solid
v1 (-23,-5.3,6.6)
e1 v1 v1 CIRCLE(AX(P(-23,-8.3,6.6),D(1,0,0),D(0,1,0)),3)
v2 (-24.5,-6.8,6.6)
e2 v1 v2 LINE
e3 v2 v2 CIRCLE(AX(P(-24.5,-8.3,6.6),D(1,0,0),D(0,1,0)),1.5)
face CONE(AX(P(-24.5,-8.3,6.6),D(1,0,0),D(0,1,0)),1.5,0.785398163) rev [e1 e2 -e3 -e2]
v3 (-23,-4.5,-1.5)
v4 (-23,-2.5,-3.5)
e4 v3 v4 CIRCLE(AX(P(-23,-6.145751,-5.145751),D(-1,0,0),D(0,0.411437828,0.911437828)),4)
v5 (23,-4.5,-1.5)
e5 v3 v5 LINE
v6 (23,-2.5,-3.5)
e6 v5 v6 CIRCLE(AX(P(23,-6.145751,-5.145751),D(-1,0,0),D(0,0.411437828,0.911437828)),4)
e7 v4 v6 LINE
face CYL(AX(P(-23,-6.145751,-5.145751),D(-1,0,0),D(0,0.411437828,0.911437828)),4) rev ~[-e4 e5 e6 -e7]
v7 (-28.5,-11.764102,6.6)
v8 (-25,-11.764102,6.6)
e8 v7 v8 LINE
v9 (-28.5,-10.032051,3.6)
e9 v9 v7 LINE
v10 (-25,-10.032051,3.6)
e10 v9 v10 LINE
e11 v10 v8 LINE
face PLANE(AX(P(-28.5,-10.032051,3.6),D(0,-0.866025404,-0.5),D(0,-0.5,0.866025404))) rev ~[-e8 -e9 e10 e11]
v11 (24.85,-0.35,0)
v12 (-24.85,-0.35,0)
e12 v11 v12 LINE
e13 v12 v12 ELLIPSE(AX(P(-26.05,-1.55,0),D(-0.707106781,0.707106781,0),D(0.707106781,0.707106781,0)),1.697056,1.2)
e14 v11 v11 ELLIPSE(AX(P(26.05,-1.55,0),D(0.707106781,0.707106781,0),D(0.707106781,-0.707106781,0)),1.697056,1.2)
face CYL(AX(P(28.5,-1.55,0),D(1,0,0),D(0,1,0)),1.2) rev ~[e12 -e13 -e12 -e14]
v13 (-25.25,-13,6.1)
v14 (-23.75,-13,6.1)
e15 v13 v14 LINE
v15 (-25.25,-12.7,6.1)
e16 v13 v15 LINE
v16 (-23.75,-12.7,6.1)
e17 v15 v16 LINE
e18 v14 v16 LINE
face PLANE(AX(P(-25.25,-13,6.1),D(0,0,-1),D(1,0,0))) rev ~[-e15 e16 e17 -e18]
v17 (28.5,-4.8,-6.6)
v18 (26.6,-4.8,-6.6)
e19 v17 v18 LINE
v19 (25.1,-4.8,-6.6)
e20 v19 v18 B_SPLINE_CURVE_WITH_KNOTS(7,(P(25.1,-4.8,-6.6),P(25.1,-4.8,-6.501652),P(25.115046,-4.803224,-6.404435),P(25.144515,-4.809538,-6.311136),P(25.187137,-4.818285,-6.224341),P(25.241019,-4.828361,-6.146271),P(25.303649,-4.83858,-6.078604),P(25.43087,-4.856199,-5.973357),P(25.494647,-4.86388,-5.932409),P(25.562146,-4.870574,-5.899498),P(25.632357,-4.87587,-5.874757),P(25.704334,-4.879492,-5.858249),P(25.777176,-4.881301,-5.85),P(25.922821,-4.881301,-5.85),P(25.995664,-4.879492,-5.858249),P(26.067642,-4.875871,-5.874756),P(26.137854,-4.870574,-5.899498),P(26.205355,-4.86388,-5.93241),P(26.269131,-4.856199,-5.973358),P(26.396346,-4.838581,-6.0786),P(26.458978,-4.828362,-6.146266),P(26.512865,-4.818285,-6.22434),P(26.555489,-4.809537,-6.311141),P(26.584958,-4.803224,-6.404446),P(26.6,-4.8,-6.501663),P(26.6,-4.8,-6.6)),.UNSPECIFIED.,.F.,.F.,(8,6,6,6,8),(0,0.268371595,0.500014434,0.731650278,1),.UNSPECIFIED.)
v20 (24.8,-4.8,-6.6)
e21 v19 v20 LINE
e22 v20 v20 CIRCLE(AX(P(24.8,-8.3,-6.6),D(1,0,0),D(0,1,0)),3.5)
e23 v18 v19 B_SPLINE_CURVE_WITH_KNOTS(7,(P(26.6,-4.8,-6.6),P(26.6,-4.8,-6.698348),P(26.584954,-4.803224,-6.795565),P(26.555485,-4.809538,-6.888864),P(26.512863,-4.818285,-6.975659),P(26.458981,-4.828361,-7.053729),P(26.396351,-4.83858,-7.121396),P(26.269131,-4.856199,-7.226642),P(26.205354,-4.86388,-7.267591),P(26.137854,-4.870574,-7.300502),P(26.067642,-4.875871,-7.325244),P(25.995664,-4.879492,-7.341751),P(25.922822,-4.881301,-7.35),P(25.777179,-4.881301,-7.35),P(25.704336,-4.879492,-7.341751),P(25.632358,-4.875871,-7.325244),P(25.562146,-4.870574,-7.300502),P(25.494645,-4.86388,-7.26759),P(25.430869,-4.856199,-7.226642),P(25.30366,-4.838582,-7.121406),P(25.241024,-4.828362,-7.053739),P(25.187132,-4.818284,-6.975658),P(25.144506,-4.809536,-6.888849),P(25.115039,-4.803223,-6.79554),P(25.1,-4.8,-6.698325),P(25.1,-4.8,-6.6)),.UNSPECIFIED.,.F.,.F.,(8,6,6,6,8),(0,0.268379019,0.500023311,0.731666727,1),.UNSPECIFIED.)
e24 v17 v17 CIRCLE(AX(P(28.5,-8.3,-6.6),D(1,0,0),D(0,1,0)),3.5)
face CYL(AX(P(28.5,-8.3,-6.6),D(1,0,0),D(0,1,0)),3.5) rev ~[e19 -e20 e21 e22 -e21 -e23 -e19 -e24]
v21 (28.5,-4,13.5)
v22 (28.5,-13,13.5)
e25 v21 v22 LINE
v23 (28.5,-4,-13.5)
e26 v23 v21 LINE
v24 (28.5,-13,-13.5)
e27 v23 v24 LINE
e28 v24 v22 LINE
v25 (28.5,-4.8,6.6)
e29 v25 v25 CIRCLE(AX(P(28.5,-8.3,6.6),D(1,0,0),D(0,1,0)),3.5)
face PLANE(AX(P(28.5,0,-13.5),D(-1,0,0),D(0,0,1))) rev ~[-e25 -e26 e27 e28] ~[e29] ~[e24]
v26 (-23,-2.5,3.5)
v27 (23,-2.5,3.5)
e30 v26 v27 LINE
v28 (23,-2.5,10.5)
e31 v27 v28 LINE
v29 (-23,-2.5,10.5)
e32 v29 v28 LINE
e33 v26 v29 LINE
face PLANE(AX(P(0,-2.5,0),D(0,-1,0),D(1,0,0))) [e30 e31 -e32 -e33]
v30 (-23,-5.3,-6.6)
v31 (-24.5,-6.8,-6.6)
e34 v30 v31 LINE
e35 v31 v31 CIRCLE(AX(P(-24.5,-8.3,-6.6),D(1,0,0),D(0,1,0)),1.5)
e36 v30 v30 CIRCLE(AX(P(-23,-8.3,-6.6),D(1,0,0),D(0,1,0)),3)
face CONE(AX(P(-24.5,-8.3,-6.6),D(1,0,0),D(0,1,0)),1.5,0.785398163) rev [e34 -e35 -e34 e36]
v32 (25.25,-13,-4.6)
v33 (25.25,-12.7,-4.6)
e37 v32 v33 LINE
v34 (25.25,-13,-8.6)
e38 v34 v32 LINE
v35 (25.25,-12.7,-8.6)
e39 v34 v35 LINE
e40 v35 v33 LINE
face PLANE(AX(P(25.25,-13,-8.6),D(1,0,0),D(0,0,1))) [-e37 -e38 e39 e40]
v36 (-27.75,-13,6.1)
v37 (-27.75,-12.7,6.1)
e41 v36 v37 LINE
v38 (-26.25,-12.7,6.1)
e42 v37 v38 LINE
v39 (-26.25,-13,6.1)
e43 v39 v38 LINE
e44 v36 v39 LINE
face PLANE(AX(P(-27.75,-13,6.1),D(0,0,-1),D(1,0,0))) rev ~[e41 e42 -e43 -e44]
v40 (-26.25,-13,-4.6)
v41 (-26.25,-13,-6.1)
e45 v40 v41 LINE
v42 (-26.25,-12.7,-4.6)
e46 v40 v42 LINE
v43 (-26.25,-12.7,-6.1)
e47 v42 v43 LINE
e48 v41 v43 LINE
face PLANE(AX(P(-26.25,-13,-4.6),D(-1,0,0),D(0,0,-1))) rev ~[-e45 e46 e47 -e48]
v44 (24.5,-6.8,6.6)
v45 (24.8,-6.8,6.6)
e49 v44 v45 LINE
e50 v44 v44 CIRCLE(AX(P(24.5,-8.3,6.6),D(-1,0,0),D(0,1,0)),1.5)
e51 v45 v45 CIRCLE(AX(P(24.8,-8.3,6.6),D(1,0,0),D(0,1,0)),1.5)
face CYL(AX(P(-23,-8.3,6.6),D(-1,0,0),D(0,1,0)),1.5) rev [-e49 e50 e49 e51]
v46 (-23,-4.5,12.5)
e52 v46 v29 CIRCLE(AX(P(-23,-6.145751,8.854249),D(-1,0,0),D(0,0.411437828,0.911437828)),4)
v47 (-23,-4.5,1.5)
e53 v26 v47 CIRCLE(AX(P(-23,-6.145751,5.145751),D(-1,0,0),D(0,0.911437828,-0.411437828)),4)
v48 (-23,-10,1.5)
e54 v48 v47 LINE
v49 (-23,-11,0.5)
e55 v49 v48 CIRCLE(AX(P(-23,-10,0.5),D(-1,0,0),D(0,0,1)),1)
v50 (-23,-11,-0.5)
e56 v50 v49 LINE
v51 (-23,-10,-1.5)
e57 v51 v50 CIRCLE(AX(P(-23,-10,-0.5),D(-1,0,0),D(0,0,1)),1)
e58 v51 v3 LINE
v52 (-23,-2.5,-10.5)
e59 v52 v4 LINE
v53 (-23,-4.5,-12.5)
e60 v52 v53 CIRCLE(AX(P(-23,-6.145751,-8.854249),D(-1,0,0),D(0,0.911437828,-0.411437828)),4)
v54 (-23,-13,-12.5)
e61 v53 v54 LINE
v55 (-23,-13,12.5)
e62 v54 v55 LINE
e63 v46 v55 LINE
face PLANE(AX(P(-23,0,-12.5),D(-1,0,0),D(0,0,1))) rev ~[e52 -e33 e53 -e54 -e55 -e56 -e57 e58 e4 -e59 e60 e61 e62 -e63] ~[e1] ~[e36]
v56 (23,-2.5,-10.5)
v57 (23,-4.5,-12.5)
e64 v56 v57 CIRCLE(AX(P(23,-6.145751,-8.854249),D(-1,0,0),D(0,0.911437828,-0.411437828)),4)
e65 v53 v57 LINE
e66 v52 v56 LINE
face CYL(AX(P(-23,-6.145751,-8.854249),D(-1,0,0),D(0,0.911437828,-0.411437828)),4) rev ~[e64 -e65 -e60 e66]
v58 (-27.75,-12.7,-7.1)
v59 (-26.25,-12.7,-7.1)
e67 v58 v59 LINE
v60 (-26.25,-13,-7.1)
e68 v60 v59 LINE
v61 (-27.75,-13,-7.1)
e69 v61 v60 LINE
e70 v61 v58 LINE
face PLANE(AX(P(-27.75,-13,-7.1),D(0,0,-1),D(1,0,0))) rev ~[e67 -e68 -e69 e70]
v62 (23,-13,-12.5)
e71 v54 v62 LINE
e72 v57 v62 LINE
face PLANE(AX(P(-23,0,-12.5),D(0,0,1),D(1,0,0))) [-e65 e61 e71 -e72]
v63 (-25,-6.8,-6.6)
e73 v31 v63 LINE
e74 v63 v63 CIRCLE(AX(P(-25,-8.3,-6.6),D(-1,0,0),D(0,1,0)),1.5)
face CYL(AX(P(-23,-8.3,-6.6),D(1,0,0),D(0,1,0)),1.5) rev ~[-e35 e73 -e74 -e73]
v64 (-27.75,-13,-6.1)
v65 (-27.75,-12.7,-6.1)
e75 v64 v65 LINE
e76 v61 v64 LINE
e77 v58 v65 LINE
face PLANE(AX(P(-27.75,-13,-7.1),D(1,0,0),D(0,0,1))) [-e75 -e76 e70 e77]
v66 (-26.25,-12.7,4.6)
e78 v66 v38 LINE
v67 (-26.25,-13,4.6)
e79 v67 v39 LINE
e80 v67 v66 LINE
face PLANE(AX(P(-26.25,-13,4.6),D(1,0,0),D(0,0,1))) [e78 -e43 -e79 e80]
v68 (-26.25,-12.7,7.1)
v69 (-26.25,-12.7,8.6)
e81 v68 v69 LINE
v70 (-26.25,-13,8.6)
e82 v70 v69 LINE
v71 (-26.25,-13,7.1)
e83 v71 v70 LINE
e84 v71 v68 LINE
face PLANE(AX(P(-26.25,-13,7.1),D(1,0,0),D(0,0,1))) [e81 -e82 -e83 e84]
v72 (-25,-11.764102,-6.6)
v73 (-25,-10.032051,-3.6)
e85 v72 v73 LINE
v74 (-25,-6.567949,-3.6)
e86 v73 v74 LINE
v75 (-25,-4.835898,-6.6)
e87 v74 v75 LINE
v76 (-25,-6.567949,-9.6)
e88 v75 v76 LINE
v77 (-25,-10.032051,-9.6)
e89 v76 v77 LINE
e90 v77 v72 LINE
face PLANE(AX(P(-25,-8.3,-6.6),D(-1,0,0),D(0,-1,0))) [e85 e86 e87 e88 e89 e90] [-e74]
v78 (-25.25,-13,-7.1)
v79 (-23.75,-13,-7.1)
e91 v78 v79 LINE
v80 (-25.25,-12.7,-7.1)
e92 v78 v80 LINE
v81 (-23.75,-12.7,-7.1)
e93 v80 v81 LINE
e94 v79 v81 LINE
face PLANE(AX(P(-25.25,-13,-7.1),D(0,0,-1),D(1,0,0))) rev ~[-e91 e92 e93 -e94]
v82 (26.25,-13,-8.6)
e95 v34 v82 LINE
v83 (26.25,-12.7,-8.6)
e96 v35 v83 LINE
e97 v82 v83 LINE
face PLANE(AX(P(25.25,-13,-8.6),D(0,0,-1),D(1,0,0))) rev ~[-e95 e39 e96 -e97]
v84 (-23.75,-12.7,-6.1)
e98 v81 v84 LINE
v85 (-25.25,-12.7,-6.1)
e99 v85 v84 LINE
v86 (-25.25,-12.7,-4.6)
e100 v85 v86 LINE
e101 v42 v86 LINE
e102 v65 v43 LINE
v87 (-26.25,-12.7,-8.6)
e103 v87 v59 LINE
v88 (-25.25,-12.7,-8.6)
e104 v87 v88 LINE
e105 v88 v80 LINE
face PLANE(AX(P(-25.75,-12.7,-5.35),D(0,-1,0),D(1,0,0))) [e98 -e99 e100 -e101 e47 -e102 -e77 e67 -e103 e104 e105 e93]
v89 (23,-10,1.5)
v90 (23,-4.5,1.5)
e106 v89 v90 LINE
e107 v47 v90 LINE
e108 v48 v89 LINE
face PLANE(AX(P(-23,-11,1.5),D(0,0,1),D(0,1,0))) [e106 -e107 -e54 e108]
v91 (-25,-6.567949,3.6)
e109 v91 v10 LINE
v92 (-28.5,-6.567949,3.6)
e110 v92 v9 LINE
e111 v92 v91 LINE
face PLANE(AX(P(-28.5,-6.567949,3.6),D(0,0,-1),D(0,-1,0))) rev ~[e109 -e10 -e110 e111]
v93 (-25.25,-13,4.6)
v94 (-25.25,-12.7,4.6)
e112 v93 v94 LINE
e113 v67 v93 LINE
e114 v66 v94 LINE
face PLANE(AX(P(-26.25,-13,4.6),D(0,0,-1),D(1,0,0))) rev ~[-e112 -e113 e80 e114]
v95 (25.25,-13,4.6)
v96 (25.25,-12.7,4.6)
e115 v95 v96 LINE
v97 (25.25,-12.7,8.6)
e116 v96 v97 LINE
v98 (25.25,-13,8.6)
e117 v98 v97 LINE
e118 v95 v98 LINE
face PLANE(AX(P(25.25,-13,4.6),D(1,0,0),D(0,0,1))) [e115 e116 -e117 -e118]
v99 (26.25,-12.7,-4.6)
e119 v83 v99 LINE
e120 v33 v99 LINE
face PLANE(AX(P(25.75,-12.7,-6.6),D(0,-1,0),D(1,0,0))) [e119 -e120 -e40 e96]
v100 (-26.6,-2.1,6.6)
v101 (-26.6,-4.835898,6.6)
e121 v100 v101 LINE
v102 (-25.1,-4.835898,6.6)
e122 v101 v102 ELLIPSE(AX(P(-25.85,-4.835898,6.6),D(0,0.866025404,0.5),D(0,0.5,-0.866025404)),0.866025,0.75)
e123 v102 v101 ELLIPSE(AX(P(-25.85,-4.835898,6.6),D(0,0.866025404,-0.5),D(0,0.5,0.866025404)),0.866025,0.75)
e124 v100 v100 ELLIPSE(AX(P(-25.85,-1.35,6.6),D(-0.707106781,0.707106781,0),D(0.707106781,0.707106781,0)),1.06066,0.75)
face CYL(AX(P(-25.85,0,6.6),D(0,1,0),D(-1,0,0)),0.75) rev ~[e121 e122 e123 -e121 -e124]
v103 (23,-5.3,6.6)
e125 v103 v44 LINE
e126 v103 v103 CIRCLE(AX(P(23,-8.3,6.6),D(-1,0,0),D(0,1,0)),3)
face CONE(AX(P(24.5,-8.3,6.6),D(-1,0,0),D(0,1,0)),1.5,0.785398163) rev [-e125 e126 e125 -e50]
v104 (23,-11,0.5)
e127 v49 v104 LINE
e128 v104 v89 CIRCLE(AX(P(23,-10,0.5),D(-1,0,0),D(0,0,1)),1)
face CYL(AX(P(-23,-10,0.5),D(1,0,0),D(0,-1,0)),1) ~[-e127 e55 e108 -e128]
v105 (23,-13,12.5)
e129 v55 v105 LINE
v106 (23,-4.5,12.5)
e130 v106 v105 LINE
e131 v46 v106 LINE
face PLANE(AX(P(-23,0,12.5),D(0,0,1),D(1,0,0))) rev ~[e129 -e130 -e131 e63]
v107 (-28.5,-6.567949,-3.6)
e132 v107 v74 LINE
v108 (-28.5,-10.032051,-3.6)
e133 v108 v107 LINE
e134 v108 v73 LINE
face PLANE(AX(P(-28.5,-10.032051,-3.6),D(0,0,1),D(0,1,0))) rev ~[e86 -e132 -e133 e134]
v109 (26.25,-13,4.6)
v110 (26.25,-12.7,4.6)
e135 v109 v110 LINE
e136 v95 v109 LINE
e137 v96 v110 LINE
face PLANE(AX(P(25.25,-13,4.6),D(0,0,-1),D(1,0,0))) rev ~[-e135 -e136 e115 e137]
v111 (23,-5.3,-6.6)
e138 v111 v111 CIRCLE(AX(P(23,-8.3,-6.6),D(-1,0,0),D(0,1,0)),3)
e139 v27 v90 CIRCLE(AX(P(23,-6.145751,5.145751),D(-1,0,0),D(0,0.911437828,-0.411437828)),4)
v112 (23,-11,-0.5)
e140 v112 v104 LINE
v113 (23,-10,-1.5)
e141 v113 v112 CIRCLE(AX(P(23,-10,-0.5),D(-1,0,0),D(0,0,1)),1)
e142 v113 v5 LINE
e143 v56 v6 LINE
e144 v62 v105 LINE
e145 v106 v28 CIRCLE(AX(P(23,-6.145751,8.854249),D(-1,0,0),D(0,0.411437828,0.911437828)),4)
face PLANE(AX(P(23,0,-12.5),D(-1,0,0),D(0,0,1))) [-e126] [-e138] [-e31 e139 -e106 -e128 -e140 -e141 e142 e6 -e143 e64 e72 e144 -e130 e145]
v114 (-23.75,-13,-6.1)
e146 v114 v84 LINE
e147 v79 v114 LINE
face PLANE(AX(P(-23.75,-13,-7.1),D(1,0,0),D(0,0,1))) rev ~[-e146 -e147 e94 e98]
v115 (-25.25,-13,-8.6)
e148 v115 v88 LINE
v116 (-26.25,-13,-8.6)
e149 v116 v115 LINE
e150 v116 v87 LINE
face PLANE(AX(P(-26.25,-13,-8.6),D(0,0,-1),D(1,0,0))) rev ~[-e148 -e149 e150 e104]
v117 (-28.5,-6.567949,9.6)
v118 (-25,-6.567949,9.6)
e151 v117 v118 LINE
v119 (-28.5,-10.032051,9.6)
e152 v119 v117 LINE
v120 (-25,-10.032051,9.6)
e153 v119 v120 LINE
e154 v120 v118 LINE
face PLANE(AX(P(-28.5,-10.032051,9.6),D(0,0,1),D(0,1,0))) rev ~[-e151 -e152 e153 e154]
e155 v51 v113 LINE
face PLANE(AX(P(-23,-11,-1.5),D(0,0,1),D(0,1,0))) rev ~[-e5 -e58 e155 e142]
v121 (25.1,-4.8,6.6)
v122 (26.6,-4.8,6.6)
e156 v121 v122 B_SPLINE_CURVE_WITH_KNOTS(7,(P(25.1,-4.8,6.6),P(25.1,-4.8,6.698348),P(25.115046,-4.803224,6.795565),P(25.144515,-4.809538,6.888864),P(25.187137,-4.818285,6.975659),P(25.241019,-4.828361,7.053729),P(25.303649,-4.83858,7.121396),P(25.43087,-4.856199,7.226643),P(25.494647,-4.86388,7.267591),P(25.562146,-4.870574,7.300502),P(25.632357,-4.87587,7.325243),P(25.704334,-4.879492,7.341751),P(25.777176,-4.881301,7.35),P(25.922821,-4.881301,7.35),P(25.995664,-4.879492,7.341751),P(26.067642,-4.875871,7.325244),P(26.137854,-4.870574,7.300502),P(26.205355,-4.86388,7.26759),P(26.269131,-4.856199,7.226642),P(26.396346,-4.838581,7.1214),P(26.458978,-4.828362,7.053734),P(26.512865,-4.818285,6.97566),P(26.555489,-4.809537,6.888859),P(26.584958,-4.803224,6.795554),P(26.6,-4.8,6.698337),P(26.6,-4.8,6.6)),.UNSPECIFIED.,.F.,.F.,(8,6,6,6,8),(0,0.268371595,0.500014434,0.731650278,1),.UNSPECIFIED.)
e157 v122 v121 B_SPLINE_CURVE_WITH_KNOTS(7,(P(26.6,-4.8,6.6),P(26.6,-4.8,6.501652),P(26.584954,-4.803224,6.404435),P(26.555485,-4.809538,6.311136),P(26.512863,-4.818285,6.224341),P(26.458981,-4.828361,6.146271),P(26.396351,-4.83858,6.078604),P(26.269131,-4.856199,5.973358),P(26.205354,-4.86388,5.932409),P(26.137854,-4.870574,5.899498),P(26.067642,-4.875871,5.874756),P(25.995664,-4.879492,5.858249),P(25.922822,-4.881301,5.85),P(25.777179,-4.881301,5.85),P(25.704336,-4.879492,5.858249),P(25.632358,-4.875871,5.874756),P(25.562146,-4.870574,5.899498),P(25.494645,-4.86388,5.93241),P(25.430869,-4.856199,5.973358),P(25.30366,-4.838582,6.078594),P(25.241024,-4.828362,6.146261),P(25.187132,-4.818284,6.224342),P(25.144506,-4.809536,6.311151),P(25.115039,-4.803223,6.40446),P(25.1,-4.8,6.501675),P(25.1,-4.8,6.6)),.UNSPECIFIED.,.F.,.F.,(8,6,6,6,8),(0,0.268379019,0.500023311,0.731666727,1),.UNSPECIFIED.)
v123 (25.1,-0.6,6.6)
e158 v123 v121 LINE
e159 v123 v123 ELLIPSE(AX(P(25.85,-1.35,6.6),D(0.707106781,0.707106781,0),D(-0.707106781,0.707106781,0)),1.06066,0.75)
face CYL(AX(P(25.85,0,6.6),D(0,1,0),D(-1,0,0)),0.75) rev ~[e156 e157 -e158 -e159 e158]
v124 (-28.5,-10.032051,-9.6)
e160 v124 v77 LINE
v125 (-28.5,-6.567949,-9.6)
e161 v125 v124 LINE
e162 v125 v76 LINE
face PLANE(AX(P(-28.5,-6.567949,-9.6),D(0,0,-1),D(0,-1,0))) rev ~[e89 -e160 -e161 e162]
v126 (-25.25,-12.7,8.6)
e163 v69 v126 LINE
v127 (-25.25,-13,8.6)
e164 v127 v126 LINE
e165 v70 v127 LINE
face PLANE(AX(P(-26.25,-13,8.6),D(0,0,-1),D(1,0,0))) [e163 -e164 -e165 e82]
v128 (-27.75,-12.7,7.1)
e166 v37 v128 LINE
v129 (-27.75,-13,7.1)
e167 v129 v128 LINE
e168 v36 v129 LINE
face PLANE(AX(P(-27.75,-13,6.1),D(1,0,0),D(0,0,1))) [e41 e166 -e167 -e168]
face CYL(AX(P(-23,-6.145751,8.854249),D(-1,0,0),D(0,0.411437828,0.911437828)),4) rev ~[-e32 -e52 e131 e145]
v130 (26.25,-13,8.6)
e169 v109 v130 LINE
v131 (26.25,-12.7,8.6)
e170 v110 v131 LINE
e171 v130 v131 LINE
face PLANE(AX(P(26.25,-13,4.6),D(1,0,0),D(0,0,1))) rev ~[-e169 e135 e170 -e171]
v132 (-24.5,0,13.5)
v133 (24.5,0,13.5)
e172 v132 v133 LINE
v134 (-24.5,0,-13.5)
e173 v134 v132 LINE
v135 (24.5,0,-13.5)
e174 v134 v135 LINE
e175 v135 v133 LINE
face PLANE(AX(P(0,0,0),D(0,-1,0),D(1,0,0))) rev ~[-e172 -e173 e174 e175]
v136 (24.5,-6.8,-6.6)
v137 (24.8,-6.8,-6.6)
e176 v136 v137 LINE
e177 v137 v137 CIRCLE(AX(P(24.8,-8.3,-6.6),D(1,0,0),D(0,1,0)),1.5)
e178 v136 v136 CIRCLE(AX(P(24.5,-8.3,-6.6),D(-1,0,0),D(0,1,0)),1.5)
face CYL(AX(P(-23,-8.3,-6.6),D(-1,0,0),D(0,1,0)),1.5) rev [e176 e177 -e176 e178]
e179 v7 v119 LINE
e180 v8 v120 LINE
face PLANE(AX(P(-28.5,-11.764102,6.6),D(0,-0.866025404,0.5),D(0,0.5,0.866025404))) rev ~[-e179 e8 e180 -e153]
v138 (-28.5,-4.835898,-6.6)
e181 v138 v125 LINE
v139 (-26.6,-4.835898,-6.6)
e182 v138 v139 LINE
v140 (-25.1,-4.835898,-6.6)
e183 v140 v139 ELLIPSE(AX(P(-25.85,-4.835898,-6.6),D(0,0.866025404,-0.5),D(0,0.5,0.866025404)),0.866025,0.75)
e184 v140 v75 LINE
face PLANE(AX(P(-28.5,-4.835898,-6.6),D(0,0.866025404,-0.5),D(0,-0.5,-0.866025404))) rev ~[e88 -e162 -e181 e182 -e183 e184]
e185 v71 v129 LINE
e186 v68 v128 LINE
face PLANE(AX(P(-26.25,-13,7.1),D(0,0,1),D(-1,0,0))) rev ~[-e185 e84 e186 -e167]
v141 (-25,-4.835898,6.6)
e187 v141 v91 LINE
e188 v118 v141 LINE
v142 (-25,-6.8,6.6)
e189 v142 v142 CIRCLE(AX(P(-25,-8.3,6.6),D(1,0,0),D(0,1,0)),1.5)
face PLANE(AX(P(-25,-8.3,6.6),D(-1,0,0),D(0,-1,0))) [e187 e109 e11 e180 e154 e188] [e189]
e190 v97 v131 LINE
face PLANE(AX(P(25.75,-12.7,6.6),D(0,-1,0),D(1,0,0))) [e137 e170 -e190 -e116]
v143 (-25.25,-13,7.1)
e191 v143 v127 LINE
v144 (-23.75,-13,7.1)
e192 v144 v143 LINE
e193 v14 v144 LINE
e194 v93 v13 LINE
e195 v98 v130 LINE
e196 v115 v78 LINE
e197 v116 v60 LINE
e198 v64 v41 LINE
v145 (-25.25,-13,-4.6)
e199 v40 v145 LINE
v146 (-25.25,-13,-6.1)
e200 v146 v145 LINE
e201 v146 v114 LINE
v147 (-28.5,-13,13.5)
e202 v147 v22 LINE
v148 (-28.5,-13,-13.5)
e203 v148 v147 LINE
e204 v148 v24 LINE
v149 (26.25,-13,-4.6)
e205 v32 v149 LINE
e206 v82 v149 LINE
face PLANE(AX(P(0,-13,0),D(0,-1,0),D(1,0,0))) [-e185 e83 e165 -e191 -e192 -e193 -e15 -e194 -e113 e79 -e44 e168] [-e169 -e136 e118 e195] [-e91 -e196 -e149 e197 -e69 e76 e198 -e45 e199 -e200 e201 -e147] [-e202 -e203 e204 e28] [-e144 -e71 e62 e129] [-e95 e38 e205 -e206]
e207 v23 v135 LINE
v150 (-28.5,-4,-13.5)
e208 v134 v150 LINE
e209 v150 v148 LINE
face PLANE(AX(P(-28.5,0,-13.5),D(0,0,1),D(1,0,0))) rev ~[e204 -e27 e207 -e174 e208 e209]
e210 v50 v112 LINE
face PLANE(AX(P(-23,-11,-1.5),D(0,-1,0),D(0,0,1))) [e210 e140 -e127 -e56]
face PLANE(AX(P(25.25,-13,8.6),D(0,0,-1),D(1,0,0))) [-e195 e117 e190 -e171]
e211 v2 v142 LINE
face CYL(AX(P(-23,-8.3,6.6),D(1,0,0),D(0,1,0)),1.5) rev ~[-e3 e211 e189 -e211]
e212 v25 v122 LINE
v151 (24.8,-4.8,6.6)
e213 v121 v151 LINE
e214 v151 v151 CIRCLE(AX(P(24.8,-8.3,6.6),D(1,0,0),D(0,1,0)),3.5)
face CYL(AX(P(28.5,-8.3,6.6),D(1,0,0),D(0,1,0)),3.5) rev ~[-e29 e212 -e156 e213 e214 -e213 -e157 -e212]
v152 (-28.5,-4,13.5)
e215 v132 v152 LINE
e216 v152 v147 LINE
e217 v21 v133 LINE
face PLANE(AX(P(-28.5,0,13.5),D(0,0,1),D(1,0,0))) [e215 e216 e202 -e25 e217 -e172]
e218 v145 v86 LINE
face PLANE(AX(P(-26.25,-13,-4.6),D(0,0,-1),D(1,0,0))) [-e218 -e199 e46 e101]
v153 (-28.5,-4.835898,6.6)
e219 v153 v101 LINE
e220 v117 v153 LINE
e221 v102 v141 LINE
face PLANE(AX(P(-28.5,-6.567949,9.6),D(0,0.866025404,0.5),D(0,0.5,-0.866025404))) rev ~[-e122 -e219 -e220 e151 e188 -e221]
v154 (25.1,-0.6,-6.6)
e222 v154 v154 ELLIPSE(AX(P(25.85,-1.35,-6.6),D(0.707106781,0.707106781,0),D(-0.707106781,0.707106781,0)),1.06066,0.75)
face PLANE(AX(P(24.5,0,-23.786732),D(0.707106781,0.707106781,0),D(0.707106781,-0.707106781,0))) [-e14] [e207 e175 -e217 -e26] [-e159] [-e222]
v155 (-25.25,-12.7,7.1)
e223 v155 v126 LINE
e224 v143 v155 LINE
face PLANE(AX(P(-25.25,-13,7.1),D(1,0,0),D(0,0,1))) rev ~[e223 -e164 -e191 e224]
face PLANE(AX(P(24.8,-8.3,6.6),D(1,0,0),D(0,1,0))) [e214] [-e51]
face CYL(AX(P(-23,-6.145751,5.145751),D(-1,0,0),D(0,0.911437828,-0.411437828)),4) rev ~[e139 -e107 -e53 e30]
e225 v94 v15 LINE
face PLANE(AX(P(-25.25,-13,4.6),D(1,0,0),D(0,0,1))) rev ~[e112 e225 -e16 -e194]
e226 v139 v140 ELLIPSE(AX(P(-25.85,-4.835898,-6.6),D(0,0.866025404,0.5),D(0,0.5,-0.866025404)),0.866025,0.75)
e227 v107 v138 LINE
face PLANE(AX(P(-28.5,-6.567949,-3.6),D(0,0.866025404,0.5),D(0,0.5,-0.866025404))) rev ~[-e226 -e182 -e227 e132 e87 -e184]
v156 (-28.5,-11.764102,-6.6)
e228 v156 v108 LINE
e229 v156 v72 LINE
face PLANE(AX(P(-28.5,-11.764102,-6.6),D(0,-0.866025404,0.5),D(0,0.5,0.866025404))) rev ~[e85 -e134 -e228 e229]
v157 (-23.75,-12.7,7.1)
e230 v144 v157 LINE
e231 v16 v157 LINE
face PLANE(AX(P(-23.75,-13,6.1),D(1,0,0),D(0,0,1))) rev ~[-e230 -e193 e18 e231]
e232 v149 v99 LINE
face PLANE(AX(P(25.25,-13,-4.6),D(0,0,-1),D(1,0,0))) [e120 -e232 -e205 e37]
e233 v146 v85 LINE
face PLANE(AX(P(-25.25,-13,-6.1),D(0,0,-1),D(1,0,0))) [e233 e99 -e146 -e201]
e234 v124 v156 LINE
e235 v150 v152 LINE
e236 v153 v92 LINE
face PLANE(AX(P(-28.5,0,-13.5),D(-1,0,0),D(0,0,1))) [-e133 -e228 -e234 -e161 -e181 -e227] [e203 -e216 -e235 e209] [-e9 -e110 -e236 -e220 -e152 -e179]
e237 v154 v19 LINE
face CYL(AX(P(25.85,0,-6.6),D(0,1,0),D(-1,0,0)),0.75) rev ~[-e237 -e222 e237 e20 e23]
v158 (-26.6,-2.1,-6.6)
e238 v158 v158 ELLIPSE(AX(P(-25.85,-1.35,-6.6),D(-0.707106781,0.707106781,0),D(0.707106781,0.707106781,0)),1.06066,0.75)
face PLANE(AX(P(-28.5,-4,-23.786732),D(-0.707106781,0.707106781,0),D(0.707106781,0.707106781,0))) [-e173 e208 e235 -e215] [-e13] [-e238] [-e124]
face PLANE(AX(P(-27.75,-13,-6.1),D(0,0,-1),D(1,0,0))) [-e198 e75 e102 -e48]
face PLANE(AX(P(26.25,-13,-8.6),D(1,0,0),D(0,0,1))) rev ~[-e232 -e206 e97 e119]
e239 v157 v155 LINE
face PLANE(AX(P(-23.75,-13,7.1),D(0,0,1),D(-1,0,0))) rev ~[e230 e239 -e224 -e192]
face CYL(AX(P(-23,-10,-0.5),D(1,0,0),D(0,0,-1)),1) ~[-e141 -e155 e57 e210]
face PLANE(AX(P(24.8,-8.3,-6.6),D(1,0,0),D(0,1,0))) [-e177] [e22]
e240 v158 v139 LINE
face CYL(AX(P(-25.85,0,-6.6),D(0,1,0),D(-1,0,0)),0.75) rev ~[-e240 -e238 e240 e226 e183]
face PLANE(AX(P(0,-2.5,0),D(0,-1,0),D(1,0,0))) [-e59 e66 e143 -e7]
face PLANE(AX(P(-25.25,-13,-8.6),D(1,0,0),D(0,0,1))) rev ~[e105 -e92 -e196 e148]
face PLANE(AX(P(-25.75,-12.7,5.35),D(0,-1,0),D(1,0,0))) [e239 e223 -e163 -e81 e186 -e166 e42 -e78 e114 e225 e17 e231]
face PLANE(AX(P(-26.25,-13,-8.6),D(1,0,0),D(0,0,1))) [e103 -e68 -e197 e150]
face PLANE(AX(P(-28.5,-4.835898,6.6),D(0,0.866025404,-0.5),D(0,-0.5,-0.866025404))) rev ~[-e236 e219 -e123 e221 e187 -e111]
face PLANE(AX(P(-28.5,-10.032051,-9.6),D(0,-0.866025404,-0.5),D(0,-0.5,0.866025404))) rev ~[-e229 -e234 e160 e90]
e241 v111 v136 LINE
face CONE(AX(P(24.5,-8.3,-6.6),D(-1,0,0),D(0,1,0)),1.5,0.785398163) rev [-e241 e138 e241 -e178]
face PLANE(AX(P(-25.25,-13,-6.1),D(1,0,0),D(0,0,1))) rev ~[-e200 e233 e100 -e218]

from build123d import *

# Parameters (mm, degrees)
F0_W          = 57
F0_H          = 27
F0_W_2        = 46
F0_H_2        = 25
F1_DEPTH      = 13
F2_DEPTH      = 2.5
F3_W          = 10
F3_H          = 3
F4_DEPTH      = 46
F5_R          = 1.5
F6_DEPTH      = 5.501
F6_DEPTH_BACK = 51.501
F7_SIZE       = 1.5
F8_R          = 1.5
F9_DEPTH      = 3.5
F10_R         = 3.5
F10_R_2       = 1.5
F11_DEPTH     = 3.7
F13_DEPTH     = 46
F14_R         = 1.2
F15_DEPTH     = 57.001
F16_R         = 0.75
F17_DEPTH     = 6
F18_T1_DEPTH  = 47.5734639037
F19_W         = 1
F19_H         = 4
F19_H_2       = 1.5
F19_W_2       = 1.5
F19_H_3       = 1
F20_DEPTH     = 0.3
F21_R         = 1


# Not quite as in the source:
# - a fillet or chamfer that OpenCascade refuses, or shapes differently, is made with other operations: its cross-section is extruded or revolved along the edge and cut away or added


with BuildPart() as f1:
    # F0 (on Front) → F1 (new body)
    with BuildSketch(Plane.XZ):
        Rectangle(F0_W, F0_H)
        Rectangle(F0_W_2, F0_H_2, mode=Mode.SUBTRACT)
    extrude(amount=F1_DEPTH)

    # F0 (on Front) → F2 (join)
    with BuildSketch(Plane.XZ):
        Rectangle(F0_W_2, F0_H_2)
    extrude(amount=F2_DEPTH)

    # F3 (on face) → F4 (join, through all)
    with BuildSketch(Plane.YZ.offset(-23)):
        with Locations((-6, 0)):
            Rectangle(F3_W, F3_H)
    extrude(amount=F4_DEPTH)

    # F5 (on face) → F6 (cut, two sides)
    with BuildSketch(Plane.YZ.offset(-23)) as f6_sk:
        with Locations((-8.3, 6.6)):
            Circle(F5_R)
        with Locations((-8.3, -6.6)):
            Circle(F5_R)
    extrude(amount=-F6_DEPTH, mode=Mode.SUBTRACT)
    extrude(f6_sk.sketch, amount=F6_DEPTH_BACK, mode=Mode.SUBTRACT)

    # F7
    f7_edges = [f1.edges().sort_by_distance(p)[0] for p in [
        (-23, -9.8, 6.6),
        (-23, -9.8, -6.6),
        (23, -9.8, 6.6),
        (23, -9.8, -6.6),
    ]]
    chamfer(f7_edges, length=F7_SIZE)

    # F8 (on face) → F9 (cut)
    with BuildSketch(Plane(origin=(-28.5, 0, 0), x_dir=(0, -1, 0), z_dir=(-1, 0, 0))):
        Polygon((6.5679491924, -3.6), (4.8358983849, -6.6), (6.5679491924, -9.6), (10.0320508076, -9.6), (11.7641016151, -6.6), (10.0320508076, -3.6), align=None)
        with Locations((8.3, -6.6)):
            Circle(F8_R, mode=Mode.SUBTRACT)
        Polygon((10.0320508076, 9.6), (6.5679491924, 9.6), (4.8358983849, 6.6), (6.5679491924, 3.6), (10.0320508076, 3.6), (11.7641016151, 6.6), align=None)
        with Locations((8.3, 6.6)):
            Circle(F8_R, mode=Mode.SUBTRACT)
        with Locations((8.3, 6.6)):
            Circle(F8_R)
    extrude(amount=-F9_DEPTH, mode=Mode.SUBTRACT)

    # F10 (on face) → F11 (cut)
    with BuildSketch(Plane.YZ.offset(28.5)):
        with Locations((-8.3, 6.6)):
            Circle(F10_R)
        with Locations((-8.3, 6.6)):
            Circle(F10_R_2, mode=Mode.SUBTRACT)
        with Locations((-8.3, -6.6)):
            Circle(F10_R)
        with Locations((-8.3, -6.6)):
            Circle(F10_R_2, mode=Mode.SUBTRACT)
    extrude(amount=-F11_DEPTH, mode=Mode.SUBTRACT)

    # F12 (on face) → F13 (join, through all)
    with BuildSketch(Plane.YZ.offset(-23)):
        with BuildLine():
            Line((-2.5, -12.5), (-2.5, -10.5))
            ThreePointArc((-2.5, -10.5), (-3.3173241863, -11.6826758137), (-4.5, -12.5))
            Line((-4.5, -12.5), (-2.5, -12.5))
        make_face()
        with BuildLine():
            ThreePointArc((-4.5, -1.5), (-3.3173241863, -2.3173241863), (-2.5, -3.5))
            Line((-2.5, -3.5), (-2.5, -1.5))
            Line((-2.5, -1.5), (-4.5, -1.5))
        make_face()
        with BuildLine():
            Line((-2.5, 12.5), (-4.5, 12.5))
            ThreePointArc((-4.5, 12.5), (-3.3173241863, 11.6826758137), (-2.5, 10.5))
            Line((-2.5, 10.5), (-2.5, 12.5))
        make_face()
        with BuildLine():
            ThreePointArc((-2.5, 3.5), (-3.3173241863, 2.3173241863), (-4.5, 1.5))
            Line((-4.5, 1.5), (-2.5, 1.5))
            Line((-2.5, 1.5), (-2.5, 3.5))
        make_face()
    extrude(amount=F13_DEPTH)

    # F14 (on face) → F15 (cut, through all)
    with BuildSketch(Plane.YZ.offset(28.5)):
        with Locations((-1.55, 0)):
            Circle(F14_R)
    extrude(amount=-F15_DEPTH, mode=Mode.SUBTRACT)

    # F16 (on face) → F17 (cut)
    with BuildSketch(Plane(origin=(0, 0, 0), x_dir=(-1, 0, 0), z_dir=(0, 1, 0))):
        with Locations((-25.85, -6.6)):
            Circle(F16_R)
        with Locations((-25.85, 6.6)):
            Circle(F16_R)
        with Locations((25.85, 6.6)):
            Circle(F16_R)
        with Locations((25.85, -6.6)):
            Circle(F16_R)
    extrude(amount=-F17_DEPTH, mode=Mode.SUBTRACT)

    # F18: chamfer of 4 on 2 edges, made by hand

    # F18_s2 → F18_t1 (cut)
    with BuildSketch(Plane.XY.offset(-23.7867319519)):
        Polygon((24.5, 0), (28.5, -4), (28.5, 0), align=None)
        Polygon((-28.5, -4), (-24.5, 0), (-28.5, 0), align=None)
    extrude(amount=F18_T1_DEPTH, mode=Mode.SUBTRACT)

    # F19 (on face) → F20 (cut)
    with BuildSketch(Plane.XZ.offset(13)):
        with Locations((25.75, -6.6)):
            Rectangle(F19_W, F19_H)
        with Locations((25.75, 6.6)):
            Rectangle(F19_W, F19_H)
        with Locations((-25.75, 5.35)):
            Rectangle(F19_W, F19_H_2)
        with Locations((-27, 6.6)):
            Rectangle(F19_W_2, F19_H_3)
        with Locations((-25.75, 6.6)):
            Rectangle(F19_W, F19_H_3)
        with Locations((-24.5, 6.6)):
            Rectangle(F19_W_2, F19_H_3)
        with Locations((-25.75, 7.85)):
            Rectangle(F19_W, F19_H_2)
        with Locations((-25.75, -5.35)):
            Rectangle(F19_W, F19_H_2)
        with Locations((-24.5, -6.6)):
            Rectangle(F19_W_2, F19_H_3)
        with Locations((-25.75, -6.6)):
            Rectangle(F19_W, F19_H_3)
        with Locations((-27, -6.6)):
            Rectangle(F19_W_2, F19_H_3)
        with Locations((-25.75, -7.85)):
            Rectangle(F19_W, F19_H_2)
    extrude(amount=-F20_DEPTH, mode=Mode.SUBTRACT)

    # F21
    f21_edges = [f1.edges().sort_by_distance(p)[0] for p in [
        (0, -11, -1.5),
        (0, -11, 1.5),
    ]]
    fillet(f21_edges, radius=F21_R)


solid = f1.part
